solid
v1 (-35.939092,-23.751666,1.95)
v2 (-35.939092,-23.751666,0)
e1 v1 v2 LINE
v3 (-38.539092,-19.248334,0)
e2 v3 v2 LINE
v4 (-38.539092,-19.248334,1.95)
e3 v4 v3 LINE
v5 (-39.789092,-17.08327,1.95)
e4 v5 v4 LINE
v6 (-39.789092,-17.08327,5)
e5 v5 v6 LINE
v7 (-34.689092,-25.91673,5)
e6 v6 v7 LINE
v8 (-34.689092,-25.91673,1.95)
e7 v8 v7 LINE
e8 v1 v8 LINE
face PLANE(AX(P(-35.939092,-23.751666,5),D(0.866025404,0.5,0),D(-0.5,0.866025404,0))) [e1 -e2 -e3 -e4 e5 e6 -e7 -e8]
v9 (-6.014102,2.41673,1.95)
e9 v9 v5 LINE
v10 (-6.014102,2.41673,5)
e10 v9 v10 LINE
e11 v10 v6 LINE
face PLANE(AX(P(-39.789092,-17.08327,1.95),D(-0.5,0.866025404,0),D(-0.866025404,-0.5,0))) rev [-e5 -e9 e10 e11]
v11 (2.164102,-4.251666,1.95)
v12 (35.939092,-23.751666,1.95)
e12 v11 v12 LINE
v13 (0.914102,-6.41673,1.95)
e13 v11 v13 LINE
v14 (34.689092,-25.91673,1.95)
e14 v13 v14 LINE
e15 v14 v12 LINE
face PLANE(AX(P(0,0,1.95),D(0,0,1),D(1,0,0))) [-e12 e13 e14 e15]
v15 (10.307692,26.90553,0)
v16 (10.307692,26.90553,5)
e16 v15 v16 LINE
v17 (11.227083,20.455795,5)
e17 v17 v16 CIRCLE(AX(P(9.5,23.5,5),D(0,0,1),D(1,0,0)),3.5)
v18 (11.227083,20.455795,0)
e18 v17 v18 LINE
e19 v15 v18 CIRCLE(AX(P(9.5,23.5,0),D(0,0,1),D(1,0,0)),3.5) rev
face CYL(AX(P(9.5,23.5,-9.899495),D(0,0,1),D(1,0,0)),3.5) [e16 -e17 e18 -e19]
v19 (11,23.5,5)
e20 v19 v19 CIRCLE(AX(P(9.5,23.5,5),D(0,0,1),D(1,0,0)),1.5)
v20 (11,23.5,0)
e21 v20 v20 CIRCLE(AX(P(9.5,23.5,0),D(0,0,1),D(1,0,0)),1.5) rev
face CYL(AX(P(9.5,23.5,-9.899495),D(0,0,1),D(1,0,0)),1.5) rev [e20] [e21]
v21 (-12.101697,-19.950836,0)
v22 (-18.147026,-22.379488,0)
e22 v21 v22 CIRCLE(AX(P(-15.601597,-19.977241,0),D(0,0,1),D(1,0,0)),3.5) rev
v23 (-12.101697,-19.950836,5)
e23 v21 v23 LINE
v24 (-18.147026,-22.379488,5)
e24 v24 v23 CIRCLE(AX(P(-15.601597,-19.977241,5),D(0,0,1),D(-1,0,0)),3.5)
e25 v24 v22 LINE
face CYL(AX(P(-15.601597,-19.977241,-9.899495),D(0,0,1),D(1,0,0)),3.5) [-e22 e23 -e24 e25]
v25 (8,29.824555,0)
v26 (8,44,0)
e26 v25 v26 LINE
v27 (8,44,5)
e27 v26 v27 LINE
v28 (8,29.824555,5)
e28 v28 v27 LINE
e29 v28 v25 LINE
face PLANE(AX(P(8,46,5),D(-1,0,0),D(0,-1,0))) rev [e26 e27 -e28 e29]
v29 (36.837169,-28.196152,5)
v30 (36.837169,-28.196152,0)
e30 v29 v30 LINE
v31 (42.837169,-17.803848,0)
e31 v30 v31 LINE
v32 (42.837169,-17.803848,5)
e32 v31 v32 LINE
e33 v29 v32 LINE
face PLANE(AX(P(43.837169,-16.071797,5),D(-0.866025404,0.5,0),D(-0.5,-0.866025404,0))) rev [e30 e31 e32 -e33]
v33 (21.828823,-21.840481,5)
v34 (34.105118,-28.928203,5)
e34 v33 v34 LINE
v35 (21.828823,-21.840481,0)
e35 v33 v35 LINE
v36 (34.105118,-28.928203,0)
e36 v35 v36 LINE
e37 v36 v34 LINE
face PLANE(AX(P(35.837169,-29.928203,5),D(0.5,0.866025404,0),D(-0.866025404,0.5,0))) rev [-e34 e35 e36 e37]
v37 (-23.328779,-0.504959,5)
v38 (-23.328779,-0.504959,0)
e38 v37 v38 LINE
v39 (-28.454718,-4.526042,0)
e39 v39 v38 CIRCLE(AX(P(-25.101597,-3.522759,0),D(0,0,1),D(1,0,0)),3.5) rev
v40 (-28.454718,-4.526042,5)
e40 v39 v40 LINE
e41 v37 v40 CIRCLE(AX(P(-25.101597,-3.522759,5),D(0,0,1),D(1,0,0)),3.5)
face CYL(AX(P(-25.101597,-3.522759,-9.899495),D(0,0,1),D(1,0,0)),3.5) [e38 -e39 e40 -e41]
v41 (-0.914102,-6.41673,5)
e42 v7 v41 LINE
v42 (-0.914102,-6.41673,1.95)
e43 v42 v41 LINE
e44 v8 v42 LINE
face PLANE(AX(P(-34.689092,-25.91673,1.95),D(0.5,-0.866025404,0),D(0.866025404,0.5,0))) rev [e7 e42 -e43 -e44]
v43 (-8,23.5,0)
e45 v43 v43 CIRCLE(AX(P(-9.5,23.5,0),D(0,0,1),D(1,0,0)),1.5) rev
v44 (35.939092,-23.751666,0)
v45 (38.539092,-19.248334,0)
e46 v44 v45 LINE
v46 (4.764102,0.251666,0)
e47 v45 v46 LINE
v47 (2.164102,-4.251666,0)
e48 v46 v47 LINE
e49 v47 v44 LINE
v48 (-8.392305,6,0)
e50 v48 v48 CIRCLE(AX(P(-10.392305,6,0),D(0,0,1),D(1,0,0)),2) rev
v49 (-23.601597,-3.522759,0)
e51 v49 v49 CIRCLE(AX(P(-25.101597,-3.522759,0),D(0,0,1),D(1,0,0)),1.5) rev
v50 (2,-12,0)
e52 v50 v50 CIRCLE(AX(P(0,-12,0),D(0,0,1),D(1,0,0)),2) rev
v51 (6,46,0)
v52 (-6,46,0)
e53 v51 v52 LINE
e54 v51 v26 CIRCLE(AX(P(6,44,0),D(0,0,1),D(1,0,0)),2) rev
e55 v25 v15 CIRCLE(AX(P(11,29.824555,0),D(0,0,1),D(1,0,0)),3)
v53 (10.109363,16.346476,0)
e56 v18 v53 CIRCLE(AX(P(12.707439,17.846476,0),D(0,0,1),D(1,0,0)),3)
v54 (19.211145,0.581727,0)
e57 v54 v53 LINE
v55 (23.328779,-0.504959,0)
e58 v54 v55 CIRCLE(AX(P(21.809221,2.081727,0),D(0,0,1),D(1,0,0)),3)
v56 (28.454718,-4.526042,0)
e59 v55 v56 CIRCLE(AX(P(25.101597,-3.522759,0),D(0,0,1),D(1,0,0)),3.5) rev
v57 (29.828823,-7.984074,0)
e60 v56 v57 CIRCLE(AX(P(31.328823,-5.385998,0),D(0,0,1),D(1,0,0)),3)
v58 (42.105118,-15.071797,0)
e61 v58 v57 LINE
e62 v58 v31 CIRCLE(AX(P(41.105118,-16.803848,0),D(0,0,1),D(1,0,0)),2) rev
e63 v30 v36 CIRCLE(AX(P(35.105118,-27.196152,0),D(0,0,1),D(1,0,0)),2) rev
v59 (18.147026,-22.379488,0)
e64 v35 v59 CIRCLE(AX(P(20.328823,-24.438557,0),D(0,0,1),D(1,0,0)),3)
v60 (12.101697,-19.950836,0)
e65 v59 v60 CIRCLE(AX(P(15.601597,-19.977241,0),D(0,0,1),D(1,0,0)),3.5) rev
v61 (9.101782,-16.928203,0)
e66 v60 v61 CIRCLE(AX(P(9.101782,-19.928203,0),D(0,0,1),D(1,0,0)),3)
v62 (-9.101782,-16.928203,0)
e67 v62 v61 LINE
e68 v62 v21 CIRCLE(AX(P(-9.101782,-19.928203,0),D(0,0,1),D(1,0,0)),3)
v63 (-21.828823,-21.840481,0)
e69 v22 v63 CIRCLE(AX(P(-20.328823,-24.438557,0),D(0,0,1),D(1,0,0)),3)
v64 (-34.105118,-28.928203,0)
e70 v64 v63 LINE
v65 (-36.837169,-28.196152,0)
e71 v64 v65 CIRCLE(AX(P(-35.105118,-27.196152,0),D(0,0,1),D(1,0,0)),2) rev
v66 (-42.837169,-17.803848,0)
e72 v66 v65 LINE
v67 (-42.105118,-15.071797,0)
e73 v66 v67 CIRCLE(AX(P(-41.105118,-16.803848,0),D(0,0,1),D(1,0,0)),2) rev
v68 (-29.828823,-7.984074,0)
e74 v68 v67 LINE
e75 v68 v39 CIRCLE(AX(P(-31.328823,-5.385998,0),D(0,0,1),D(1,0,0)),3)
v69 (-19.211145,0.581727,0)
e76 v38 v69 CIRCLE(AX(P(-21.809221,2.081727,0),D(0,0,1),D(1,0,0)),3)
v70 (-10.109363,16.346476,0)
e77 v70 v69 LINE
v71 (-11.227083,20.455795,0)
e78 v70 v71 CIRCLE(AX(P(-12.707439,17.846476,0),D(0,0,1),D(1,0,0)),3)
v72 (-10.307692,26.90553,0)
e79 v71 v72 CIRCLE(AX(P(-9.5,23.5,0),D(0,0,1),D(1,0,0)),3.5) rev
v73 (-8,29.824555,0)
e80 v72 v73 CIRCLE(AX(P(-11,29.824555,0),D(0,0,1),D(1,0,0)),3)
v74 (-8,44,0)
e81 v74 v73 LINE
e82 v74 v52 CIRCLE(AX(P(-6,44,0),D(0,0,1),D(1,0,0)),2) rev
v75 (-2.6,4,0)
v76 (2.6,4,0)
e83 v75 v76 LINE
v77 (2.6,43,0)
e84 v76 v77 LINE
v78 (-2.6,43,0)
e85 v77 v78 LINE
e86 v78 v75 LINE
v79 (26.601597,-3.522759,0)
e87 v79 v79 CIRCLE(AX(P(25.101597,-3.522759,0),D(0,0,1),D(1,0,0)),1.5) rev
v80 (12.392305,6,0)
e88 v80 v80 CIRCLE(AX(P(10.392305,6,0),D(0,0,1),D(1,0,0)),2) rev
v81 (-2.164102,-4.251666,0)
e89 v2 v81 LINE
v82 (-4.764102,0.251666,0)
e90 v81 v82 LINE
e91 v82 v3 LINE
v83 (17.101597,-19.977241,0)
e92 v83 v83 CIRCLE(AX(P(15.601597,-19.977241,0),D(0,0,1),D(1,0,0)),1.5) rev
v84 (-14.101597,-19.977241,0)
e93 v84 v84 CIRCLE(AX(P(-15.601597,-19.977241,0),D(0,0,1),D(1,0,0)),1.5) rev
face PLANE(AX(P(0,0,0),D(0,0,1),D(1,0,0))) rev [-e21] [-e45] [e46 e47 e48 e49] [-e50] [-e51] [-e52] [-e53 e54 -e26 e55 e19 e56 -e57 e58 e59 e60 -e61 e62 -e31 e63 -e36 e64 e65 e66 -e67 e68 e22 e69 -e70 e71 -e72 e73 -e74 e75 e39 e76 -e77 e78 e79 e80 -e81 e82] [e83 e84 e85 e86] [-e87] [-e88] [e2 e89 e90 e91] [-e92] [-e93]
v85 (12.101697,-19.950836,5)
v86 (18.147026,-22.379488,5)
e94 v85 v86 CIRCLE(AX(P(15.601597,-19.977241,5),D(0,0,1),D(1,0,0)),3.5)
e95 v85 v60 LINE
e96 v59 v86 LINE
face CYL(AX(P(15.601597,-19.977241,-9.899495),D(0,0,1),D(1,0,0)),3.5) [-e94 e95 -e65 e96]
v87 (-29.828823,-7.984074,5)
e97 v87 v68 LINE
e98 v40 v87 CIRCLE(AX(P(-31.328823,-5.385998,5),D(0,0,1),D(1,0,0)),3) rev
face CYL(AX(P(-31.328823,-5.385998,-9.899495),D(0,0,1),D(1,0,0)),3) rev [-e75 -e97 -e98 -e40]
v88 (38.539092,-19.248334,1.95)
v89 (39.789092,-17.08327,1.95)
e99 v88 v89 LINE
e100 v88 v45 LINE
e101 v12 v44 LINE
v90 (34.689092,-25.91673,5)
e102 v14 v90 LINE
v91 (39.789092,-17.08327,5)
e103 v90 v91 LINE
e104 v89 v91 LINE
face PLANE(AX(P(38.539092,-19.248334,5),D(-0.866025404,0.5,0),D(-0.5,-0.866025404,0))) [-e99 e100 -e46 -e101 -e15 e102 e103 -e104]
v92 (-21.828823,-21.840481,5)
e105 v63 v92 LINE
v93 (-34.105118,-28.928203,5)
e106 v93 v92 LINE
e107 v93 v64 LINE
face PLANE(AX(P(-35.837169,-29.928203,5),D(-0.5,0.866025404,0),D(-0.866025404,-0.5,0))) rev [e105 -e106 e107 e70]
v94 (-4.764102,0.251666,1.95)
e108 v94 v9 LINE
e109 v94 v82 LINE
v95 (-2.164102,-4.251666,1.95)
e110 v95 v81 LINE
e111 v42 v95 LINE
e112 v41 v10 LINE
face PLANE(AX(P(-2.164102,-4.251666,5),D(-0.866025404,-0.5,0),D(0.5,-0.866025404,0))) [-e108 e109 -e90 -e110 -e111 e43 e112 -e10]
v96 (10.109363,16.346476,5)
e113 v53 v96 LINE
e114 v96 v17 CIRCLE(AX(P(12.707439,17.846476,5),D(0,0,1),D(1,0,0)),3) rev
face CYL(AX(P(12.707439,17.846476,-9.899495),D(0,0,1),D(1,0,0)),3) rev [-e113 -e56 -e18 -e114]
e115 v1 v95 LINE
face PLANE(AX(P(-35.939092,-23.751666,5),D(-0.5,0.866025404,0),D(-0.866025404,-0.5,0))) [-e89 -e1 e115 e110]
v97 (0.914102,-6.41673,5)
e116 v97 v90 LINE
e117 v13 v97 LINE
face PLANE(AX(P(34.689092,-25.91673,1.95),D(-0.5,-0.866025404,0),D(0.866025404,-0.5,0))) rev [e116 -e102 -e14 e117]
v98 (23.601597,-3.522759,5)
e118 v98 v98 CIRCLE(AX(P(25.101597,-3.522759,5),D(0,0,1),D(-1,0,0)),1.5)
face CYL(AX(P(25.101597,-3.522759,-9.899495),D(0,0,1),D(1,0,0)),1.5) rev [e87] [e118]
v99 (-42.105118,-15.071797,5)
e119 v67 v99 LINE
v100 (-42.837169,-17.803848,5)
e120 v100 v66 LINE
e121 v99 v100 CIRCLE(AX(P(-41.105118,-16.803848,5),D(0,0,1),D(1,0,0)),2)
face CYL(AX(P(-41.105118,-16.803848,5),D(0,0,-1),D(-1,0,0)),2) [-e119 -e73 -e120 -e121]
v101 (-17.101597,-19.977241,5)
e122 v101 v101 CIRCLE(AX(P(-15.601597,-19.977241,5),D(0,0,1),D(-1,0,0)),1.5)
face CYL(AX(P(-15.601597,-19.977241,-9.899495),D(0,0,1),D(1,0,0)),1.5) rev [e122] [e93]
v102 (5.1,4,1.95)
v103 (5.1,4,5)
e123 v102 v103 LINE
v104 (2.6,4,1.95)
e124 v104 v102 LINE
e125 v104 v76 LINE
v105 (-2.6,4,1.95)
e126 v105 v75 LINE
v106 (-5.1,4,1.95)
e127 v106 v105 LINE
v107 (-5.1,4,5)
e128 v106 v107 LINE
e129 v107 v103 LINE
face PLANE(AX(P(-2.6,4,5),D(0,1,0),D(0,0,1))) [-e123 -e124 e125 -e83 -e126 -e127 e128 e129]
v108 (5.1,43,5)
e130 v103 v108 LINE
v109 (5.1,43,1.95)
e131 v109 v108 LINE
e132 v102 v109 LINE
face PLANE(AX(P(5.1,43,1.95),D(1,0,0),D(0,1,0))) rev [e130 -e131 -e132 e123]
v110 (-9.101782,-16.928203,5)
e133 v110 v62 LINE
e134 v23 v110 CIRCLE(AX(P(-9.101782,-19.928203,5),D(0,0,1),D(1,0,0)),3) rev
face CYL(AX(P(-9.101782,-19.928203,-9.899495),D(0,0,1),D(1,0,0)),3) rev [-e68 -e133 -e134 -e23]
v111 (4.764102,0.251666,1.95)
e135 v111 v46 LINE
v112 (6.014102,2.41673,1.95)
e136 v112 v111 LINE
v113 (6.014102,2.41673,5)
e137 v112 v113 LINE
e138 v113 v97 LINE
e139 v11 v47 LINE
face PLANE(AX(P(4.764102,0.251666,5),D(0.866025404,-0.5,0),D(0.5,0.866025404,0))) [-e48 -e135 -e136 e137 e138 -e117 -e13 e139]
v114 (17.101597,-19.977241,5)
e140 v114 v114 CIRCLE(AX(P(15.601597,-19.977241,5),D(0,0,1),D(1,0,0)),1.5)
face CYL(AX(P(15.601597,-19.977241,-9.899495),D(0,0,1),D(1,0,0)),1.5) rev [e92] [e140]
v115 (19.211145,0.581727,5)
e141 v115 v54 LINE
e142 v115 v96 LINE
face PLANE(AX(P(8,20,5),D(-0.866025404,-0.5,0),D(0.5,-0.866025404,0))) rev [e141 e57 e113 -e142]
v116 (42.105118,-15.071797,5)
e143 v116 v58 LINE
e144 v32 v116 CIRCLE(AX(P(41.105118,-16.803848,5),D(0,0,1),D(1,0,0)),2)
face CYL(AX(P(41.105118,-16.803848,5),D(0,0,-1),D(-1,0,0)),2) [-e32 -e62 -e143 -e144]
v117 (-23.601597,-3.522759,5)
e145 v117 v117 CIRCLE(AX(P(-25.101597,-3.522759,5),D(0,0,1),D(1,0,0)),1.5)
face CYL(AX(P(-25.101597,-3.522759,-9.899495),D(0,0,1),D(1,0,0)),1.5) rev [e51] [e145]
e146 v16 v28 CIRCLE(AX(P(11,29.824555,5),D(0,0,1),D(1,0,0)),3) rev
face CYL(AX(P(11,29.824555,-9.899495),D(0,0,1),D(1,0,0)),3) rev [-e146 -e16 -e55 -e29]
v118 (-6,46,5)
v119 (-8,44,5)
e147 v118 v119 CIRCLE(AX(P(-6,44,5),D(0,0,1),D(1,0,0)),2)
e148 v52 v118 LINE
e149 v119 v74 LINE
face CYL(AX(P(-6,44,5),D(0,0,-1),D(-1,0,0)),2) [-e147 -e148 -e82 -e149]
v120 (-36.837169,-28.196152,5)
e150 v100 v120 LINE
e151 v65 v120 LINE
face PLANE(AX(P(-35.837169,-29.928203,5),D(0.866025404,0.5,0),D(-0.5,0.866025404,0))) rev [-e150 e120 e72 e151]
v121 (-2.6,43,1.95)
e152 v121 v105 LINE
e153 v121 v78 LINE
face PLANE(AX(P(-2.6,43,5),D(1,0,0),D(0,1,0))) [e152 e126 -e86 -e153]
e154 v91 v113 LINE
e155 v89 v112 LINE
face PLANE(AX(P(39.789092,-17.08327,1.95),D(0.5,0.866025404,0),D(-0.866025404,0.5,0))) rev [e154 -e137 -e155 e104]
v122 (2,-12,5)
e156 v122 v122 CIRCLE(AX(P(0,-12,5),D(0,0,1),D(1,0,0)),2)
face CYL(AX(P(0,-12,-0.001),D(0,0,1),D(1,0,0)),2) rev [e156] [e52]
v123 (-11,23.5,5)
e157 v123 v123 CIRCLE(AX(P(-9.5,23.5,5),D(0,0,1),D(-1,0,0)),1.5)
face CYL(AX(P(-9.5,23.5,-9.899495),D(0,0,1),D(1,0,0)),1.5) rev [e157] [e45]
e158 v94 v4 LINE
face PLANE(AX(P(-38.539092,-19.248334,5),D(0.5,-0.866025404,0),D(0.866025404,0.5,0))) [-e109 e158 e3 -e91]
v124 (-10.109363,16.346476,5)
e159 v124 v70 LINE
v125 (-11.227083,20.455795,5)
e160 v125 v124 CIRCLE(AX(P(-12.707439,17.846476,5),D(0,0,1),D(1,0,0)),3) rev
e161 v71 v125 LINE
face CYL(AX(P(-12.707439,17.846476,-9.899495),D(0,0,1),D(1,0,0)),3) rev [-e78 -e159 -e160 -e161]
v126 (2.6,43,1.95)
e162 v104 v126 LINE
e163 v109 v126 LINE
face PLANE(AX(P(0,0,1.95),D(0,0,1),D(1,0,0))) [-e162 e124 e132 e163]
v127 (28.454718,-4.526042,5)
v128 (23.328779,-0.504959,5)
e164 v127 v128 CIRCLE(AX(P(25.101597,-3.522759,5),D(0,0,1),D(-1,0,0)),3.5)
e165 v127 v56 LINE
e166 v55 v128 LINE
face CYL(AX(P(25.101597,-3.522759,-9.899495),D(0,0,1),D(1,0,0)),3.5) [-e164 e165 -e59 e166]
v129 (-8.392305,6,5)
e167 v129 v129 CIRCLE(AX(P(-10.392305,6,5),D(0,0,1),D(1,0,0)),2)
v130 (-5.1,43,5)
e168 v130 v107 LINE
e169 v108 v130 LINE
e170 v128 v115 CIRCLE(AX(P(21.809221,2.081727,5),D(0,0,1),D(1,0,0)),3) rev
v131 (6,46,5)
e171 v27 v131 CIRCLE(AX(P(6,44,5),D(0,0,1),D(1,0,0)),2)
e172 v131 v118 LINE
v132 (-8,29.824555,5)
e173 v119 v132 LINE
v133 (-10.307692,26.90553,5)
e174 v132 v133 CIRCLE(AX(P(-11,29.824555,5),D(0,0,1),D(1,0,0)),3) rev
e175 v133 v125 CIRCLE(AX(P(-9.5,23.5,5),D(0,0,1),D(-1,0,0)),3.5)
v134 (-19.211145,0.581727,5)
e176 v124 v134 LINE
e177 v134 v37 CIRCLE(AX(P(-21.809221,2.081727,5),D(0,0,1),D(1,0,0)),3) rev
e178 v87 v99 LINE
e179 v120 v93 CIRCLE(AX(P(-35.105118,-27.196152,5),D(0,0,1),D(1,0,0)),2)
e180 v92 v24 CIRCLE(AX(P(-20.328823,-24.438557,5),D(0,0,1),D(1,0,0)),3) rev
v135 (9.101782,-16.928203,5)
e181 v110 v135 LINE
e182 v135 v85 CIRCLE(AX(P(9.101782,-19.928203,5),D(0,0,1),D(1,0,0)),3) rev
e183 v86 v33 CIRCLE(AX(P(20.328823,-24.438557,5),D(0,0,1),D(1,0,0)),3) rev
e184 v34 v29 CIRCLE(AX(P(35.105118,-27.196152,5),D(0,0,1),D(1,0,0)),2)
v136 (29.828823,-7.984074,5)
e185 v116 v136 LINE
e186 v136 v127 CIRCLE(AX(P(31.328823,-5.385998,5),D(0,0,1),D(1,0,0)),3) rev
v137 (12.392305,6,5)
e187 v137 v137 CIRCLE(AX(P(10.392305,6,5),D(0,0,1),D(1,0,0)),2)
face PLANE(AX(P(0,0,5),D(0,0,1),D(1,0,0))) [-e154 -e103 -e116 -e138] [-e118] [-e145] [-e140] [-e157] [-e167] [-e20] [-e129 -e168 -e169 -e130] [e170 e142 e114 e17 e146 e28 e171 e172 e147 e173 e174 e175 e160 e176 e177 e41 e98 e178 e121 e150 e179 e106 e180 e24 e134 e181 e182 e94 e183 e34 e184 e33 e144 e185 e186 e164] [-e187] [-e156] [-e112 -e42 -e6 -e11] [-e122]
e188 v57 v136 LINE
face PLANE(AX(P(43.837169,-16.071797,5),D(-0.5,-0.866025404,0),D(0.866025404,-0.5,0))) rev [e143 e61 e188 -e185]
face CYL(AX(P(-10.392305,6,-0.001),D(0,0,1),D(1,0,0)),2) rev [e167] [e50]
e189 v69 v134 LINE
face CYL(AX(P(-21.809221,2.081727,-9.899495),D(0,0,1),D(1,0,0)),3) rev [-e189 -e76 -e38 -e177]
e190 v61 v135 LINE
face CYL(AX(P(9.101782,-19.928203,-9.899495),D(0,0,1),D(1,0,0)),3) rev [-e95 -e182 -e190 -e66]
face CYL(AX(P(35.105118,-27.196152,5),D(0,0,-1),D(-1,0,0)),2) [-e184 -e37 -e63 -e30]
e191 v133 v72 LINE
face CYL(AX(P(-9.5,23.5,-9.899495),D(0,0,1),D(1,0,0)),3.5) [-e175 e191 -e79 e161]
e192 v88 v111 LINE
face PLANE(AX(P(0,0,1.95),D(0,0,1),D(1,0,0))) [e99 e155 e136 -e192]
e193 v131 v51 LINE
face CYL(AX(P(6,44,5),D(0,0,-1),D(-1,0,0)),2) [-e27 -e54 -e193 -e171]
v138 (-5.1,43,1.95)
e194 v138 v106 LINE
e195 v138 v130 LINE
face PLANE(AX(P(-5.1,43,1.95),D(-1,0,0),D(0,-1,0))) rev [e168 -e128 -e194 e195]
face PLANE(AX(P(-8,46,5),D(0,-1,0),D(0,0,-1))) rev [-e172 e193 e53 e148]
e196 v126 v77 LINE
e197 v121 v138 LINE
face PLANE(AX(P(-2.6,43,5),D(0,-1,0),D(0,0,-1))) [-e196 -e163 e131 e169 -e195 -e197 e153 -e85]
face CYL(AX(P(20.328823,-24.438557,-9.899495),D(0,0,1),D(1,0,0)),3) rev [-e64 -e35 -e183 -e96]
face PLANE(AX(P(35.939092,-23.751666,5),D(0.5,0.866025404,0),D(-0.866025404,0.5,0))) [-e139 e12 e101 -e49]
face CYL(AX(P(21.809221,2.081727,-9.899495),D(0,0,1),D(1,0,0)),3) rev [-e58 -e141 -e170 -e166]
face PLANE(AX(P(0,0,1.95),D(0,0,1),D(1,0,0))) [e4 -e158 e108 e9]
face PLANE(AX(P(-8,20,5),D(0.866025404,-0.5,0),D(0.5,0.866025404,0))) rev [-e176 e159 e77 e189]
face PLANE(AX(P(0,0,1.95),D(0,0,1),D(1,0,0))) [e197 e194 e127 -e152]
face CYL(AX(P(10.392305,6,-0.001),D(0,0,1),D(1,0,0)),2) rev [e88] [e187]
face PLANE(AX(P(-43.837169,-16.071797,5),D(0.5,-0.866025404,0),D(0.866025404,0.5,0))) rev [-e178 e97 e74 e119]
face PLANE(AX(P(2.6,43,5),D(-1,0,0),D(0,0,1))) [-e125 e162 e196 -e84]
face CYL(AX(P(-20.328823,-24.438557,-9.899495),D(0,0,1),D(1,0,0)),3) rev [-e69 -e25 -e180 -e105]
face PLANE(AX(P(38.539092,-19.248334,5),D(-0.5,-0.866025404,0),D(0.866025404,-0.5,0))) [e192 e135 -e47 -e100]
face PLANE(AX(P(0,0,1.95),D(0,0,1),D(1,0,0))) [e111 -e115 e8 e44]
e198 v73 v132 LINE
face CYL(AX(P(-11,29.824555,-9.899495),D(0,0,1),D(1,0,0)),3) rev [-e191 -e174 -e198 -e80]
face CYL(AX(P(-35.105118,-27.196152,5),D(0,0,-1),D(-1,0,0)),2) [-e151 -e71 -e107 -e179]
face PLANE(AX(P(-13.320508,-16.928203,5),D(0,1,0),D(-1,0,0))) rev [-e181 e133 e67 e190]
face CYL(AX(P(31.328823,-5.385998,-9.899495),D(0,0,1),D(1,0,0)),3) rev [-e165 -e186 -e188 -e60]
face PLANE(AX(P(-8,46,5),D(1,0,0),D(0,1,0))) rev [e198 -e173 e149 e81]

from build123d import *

# Parameters (mm, degrees)
SKETCH1_W           = 5.2
SKETCH1_H           = 39
BOSS_EXTRUDE1_DEPTH = 5
SKETCH2_W           = 10.2
SKETCH2_H           = 39
CUT_EXTRUDE1_DEPTH  = 3.05
CUT_EXTRUDE2_REACH  = 65.739
SKETCH3_R           = 2
SKETCH4_R           = 3.5
SKETCH4_R_2         = 1.5
BOSS_EXTRUDE2_DEPTH = 5
FILLET1_R           = 3
FILLET2_R           = 3
FILLET3_R           = 2


with BuildPart() as part:
    # Sketch1 → Boss-Extrude1 (new body)
    with BuildSketch(Plane.XY):
        Polygon((-8, 46), (8, 46), (8, 20), (21.320508076, -3.07179677), (43.837168574, -16.07179677), (35.837168574, -29.92820323), (13.320508076, -16.92820323), (-13.320508076, -16.92820323), (-35.837168574, -29.92820323), (-43.837168574, -16.07179677), (-21.320508076, -3.07179677), (-8, 20), align=None)
        Polygon((4.764101615, 0.25166605), (2.164101615, -4.25166605), (35.939092363, -23.75166605), (38.539092363, -19.24833395), align=None, mode=Mode.SUBTRACT)
        with Locations((0, 23.5)):
            Rectangle(SKETCH1_W, SKETCH1_H, mode=Mode.SUBTRACT)
        Polygon((-2.164101615, -4.25166605), (-4.764101615, 0.25166605), (-38.539092363, -19.24833395), (-35.939092363, -23.75166605), align=None, mode=Mode.SUBTRACT)
    extrude(amount=BOSS_EXTRUDE1_DEPTH)

    # Sketch2 → Cut-Extrude1 (cut)
    with BuildSketch(Plane.XY.offset(5)):
        with Locations((0, 23.5)):
            Rectangle(SKETCH2_W, SKETCH2_H)
        Polygon((39.789092363, -17.083270441), (34.689092363, -25.916729559), (0.914101615, -6.416729559), (6.014101615, 2.416729559), align=None)
        Polygon((-34.689092363, -25.916729559), (-39.789092363, -17.083270441), (-6.014101615, 2.416729559), (-0.914101615, -6.416729559), align=None)
    extrude(amount=-CUT_EXTRUDE1_DEPTH, mode=Mode.SUBTRACT)

    # Sketch3 → Cut-Extrude2 (cut, up to next)
    with BuildSketch(Plane.XY.offset(5), mode=Mode.PRIVATE) as cut_extrude2_sk1:
        with Locations((0, -12)):
            Circle(SKETCH3_R)
    cut_extrude2_tool1 = extrude(cut_extrude2_sk1.sketch, amount=-CUT_EXTRUDE2_REACH, mode=Mode.PRIVATE) & part.part
    # Sketch3 → Cut-Extrude2 (cut, up to next)
    with BuildSketch(Plane.XY.offset(5), mode=Mode.PRIVATE) as cut_extrude2_sk2:
        with Locations((-10.392304845, 6)):
            Circle(SKETCH3_R)
    cut_extrude2_tool2 = extrude(cut_extrude2_sk2.sketch, amount=-CUT_EXTRUDE2_REACH, mode=Mode.PRIVATE) & part.part
    # Sketch3 → Cut-Extrude2 (cut, up to next)
    with BuildSketch(Plane.XY.offset(5), mode=Mode.PRIVATE) as cut_extrude2_sk3:
        with Locations((10.392304845, 6)):
            Circle(SKETCH3_R)
    cut_extrude2_tool3 = extrude(cut_extrude2_sk3.sketch, amount=-CUT_EXTRUDE2_REACH, mode=Mode.PRIVATE) & part.part
    add(cut_extrude2_tool1.solids().sort_by_distance((0, -12, 5))[0], mode=Mode.SUBTRACT)
    add(cut_extrude2_tool2.solids().sort_by_distance((-10.392305, 6, 5))[0], mode=Mode.SUBTRACT)
    add(cut_extrude2_tool3.solids().sort_by_distance((10.392305, 6, 5))[0], mode=Mode.SUBTRACT)

    # Sketch4 → Boss-Extrude2 (add)
    # profile 1 of 6: a face of its own
    with BuildSketch(Plane.XY.offset(5)):
        with Locations((9.5, 23.5)):
            Circle(SKETCH4_R)
        with Locations((9.5, 23.5)):
            Circle(SKETCH4_R_2, mode=Mode.SUBTRACT)
    # profile 2 of 6: a face of its own
    with BuildSketch(Plane.XY.offset(5)):
        with Locations((-9.5, 23.5)):
            Circle(SKETCH4_R)
        with Locations((-9.5, 23.5)):
            Circle(SKETCH4_R_2, mode=Mode.SUBTRACT)
    # profile 3 of 6: a face of its own
    with BuildSketch(Plane.XY.offset(5)):
        with Locations((25.101596989, -3.522758664)):
            Circle(SKETCH4_R)
        with Locations((25.101596989, -3.522758664)):
            Circle(SKETCH4_R_2, mode=Mode.SUBTRACT)
    # profile 4 of 6: a face of its own
    with BuildSketch(Plane.XY.offset(5)):
        with Locations((15.601596989, -19.977241336)):
            Circle(SKETCH4_R)
        with Locations((15.601596989, -19.977241336)):
            Circle(SKETCH4_R_2, mode=Mode.SUBTRACT)
    # profile 5 of 6: a face of its own
    with BuildSketch(Plane.XY.offset(5)):
        with Locations((-15.601596989, -19.977241336)):
            Circle(SKETCH4_R)
        with Locations((-15.601596989, -19.977241336)):
            Circle(SKETCH4_R_2, mode=Mode.SUBTRACT)
    # profile 6 of 6: a face of its own
    with BuildSketch(Plane.XY.offset(5)):
        with Locations((-25.101596989, -3.522758664)):
            Circle(SKETCH4_R)
        with Locations((-25.101596989, -3.522758664)):
            Circle(SKETCH4_R_2, mode=Mode.SUBTRACT)
    extrude(amount=-BOSS_EXTRUDE2_DEPTH)

    # Fillet1
    # the kernel refuses this fillet: 3 mm, written as the material it adds along each edge
    with BuildSketch(Plane(origin=(8, 26.66227766, 0), x_dir=(0.9944903161976937, 0.10482848367219241, 0), z_dir=(0, 0, 1)), Plane(origin=(19.090209776, -20.25934206, 0), x_dir=(-0.40646102819849994, -0.9136681194809295, 0), z_dir=(0, 0, 1)), Plane(origin=(-27.090209776, -6.4029356, 0), x_dir=(-0.5880292879992107, 0.8088396358086942, 0), z_dir=(0, 0, 1))) as fillet1_piece_1:
        with BuildLine():
            CenterArc((3.314967721, 2.830369059), FILLET1_R, 173.982715136, 76.657636203)
            Line((0.331496772, 3.14485451), (0.271827353, 3.151144219))
            Line((0.271827353, 3.151144219), (-0.059669419, 0.006289709))
            Line((-0.059669419, 0.006289709), (0.019889806, -0.056607381))
            ThreePointArc((0.019889806, -0.056607381), (1.160238702, 0.137902764), (2.300587598, -0.056607381))
            Line((2.300587598, -0.056607381), (2.320477404, 0))
        make_face()
    extrude(amount=5)
    with BuildSketch(Plane(origin=(8, 20.33772234, 0), x_dir=(0, -1, 0), z_dir=(0, 0, 1)), Plane(origin=(13.612984201, -17.0970644, 0), x_dir=(-0.8660254037844379, 0.5000000000000013, 0), z_dir=(0, 0, 1)), Plane(origin=(-21.612984201, -3.24065794, 0), x_dir=(0.8660254037844385, 0.5000000000000004, 0), z_dir=(0, 0, 1))) as fillet1_piece_2:
        with BuildLine():
            CenterArc((3.27592086, 0.605796547), FILLET1_R, 172.092756849, 19.557213735)
            Line((0.30444462, 1.018505833), (0.245015095, 1.026760019))
            ThreePointArc((0.245015095, 1.026760019), (0.133629185, 0.514810643), (-0.054210474, 0.025714286))
            Line((-0.054210474, 0.025714286), (0, -0.06))
            ThreePointArc((0, -0.06), (0.16886117, -0.06), (0.278958369, -0.012115931))
            Line((0.278958369, -0.012115931), (0.33772234, 0))
        make_face()
    extrude(amount=5)
    with BuildSketch(Plane(origin=(-8, 20.33772234, 0), x_dir=(-0.9581124549425506, -0.2863922549301202, 0), z_dir=(0, 0, 1)), Plane(origin=(21.612984201, -3.24065794, 0), x_dir=(0.231033259254711, 0.9729458531275754, 0), z_dir=(0, 0, 1)), Plane(origin=(-13.612984201, -17.0970644, 0), x_dir=(0.7270791956878222, -0.6865535981975109, 0), z_dir=(0, 0, 1))) as fillet1_piece_3:
        with BuildLine():
            CenterArc((1.518619579, 2.965205138), FILLET1_R, 241.707941077, 19.557213735)
            Line((0.096721062, 0.32357598), (0.068283092, 0.270743397))
            ThreePointArc((0.068283092, 0.270743397), (-0.009126216, 0.178971525), (-0.057486747, 0.017183535))
            Line((-0.057486747, 0.017183535), (0.009111717, -0.059304103))
            ThreePointArc((0.009111717, -0.059304103), (0.531516853, -0.019405995), (1.053921988, -0.059304103))
            Line((1.053921988, -0.059304103), (1.063033705, 0))
        make_face()
    extrude(amount=5)
    with BuildSketch(Plane(origin=(-8, 26.66227766, 0), x_dir=(-0.9944903161976939, 0.10482848367219239, 0), z_dir=(0, 0, 1))) as fillet1_piece_4:
        with BuildLine():
            CenterArc((3.314967721, -2.830369059), FILLET1_R, 109.359648661, 76.657636203)
            Line((0.331496772, -3.14485451), (0.271827353, -3.151144219))
            Line((0.271827353, -3.151144219), (-0.059669419, -0.006289709))
            Line((-0.059669419, -0.006289709), (0.019889806, 0.056607381))
            ThreePointArc((0.019889806, 0.056607381), (1.160238702, -0.137902764), (2.300587598, 0.056607381))
            Line((2.300587598, 0.056607381), (2.320477404, 0))
        make_face()
    extrude(amount=5)
    with BuildSketch(Plane(origin=(27.090209776, -6.4029356, 0), x_dir=(0.8660254037844388, -0.4999999999999998, 0), z_dir=(0, 0, 1)), Plane(origin=(-19.090209776, -20.25934206, 0), x_dir=(-0.8660254037844379, -0.5000000000000012, 0), z_dir=(0, 0, 1))) as fillet1_piece_5:
        with BuildLine():
            CenterArc((3.16227766, 3), FILLET1_R, 193.342363797, 76.657636203)
            Line((0.243252128, 2.307692308), (0.184871617, 2.293846154))
            ThreePointArc((0.184871617, 2.293846154), (0.258769028, 1.139390016), (-0.054210474, 0.025714286))
            Line((-0.054210474, 0.025714286), (0, -0.06))
            Line((0, -0.06), (3.16227766, -0.06))
            Line((3.16227766, -0.06), (3.16227766, 0))
        make_face()
    extrude(amount=5)

    # Fillet2
    fillet2_edges = [part.edges().sort_by_distance(p)[0] for p in [
        (8, 20, 2.5),
    ]]
    fillet(fillet2_edges, radius=FILLET2_R)
    fillet2_2_edges = [part.edges().sort_by_distance(p)[0] for p in [
        (-13.320508076, -16.92820323, 2.5),
    ]]
    fillet(fillet2_2_edges, radius=FILLET2_R)
    fillet2_3_edges = [part.edges().sort_by_distance(p)[0] for p in [
        (13.320508076, -16.92820323, 2.5),
    ]]
    fillet(fillet2_3_edges, radius=FILLET2_R)
    fillet2_4_edges = [part.edges().sort_by_distance(p)[0] for p in [
        (-8, 20, 2.5),
    ]]
    fillet(fillet2_4_edges, radius=FILLET2_R)
    fillet2_5_edges = [part.edges().sort_by_distance(p)[0] for p in [
        (-21.320508076, -3.07179677, 2.5),
    ]]
    fillet(fillet2_5_edges, radius=FILLET2_R)
    fillet2_6_edges = [part.edges().sort_by_distance(p)[0] for p in [
        (21.320508076, -3.07179677, 2.5),
    ]]
    fillet(fillet2_6_edges, radius=FILLET2_R)

    # Fillet3
    fillet3_edges = [part.edges().sort_by_distance(p)[0] for p in [
        (43.837168574, -16.07179677, 2.5),
        (35.837168574, -29.92820323, 2.5),
        (-35.837168574, -29.92820323, 2.5),
        (-43.837168574, -16.07179677, 2.5),
        (-8, 46, 2.5),
        (8, 46, 2.5),
    ]]
    fillet(fillet3_edges, radius=FILLET3_R)


solid = part.part
